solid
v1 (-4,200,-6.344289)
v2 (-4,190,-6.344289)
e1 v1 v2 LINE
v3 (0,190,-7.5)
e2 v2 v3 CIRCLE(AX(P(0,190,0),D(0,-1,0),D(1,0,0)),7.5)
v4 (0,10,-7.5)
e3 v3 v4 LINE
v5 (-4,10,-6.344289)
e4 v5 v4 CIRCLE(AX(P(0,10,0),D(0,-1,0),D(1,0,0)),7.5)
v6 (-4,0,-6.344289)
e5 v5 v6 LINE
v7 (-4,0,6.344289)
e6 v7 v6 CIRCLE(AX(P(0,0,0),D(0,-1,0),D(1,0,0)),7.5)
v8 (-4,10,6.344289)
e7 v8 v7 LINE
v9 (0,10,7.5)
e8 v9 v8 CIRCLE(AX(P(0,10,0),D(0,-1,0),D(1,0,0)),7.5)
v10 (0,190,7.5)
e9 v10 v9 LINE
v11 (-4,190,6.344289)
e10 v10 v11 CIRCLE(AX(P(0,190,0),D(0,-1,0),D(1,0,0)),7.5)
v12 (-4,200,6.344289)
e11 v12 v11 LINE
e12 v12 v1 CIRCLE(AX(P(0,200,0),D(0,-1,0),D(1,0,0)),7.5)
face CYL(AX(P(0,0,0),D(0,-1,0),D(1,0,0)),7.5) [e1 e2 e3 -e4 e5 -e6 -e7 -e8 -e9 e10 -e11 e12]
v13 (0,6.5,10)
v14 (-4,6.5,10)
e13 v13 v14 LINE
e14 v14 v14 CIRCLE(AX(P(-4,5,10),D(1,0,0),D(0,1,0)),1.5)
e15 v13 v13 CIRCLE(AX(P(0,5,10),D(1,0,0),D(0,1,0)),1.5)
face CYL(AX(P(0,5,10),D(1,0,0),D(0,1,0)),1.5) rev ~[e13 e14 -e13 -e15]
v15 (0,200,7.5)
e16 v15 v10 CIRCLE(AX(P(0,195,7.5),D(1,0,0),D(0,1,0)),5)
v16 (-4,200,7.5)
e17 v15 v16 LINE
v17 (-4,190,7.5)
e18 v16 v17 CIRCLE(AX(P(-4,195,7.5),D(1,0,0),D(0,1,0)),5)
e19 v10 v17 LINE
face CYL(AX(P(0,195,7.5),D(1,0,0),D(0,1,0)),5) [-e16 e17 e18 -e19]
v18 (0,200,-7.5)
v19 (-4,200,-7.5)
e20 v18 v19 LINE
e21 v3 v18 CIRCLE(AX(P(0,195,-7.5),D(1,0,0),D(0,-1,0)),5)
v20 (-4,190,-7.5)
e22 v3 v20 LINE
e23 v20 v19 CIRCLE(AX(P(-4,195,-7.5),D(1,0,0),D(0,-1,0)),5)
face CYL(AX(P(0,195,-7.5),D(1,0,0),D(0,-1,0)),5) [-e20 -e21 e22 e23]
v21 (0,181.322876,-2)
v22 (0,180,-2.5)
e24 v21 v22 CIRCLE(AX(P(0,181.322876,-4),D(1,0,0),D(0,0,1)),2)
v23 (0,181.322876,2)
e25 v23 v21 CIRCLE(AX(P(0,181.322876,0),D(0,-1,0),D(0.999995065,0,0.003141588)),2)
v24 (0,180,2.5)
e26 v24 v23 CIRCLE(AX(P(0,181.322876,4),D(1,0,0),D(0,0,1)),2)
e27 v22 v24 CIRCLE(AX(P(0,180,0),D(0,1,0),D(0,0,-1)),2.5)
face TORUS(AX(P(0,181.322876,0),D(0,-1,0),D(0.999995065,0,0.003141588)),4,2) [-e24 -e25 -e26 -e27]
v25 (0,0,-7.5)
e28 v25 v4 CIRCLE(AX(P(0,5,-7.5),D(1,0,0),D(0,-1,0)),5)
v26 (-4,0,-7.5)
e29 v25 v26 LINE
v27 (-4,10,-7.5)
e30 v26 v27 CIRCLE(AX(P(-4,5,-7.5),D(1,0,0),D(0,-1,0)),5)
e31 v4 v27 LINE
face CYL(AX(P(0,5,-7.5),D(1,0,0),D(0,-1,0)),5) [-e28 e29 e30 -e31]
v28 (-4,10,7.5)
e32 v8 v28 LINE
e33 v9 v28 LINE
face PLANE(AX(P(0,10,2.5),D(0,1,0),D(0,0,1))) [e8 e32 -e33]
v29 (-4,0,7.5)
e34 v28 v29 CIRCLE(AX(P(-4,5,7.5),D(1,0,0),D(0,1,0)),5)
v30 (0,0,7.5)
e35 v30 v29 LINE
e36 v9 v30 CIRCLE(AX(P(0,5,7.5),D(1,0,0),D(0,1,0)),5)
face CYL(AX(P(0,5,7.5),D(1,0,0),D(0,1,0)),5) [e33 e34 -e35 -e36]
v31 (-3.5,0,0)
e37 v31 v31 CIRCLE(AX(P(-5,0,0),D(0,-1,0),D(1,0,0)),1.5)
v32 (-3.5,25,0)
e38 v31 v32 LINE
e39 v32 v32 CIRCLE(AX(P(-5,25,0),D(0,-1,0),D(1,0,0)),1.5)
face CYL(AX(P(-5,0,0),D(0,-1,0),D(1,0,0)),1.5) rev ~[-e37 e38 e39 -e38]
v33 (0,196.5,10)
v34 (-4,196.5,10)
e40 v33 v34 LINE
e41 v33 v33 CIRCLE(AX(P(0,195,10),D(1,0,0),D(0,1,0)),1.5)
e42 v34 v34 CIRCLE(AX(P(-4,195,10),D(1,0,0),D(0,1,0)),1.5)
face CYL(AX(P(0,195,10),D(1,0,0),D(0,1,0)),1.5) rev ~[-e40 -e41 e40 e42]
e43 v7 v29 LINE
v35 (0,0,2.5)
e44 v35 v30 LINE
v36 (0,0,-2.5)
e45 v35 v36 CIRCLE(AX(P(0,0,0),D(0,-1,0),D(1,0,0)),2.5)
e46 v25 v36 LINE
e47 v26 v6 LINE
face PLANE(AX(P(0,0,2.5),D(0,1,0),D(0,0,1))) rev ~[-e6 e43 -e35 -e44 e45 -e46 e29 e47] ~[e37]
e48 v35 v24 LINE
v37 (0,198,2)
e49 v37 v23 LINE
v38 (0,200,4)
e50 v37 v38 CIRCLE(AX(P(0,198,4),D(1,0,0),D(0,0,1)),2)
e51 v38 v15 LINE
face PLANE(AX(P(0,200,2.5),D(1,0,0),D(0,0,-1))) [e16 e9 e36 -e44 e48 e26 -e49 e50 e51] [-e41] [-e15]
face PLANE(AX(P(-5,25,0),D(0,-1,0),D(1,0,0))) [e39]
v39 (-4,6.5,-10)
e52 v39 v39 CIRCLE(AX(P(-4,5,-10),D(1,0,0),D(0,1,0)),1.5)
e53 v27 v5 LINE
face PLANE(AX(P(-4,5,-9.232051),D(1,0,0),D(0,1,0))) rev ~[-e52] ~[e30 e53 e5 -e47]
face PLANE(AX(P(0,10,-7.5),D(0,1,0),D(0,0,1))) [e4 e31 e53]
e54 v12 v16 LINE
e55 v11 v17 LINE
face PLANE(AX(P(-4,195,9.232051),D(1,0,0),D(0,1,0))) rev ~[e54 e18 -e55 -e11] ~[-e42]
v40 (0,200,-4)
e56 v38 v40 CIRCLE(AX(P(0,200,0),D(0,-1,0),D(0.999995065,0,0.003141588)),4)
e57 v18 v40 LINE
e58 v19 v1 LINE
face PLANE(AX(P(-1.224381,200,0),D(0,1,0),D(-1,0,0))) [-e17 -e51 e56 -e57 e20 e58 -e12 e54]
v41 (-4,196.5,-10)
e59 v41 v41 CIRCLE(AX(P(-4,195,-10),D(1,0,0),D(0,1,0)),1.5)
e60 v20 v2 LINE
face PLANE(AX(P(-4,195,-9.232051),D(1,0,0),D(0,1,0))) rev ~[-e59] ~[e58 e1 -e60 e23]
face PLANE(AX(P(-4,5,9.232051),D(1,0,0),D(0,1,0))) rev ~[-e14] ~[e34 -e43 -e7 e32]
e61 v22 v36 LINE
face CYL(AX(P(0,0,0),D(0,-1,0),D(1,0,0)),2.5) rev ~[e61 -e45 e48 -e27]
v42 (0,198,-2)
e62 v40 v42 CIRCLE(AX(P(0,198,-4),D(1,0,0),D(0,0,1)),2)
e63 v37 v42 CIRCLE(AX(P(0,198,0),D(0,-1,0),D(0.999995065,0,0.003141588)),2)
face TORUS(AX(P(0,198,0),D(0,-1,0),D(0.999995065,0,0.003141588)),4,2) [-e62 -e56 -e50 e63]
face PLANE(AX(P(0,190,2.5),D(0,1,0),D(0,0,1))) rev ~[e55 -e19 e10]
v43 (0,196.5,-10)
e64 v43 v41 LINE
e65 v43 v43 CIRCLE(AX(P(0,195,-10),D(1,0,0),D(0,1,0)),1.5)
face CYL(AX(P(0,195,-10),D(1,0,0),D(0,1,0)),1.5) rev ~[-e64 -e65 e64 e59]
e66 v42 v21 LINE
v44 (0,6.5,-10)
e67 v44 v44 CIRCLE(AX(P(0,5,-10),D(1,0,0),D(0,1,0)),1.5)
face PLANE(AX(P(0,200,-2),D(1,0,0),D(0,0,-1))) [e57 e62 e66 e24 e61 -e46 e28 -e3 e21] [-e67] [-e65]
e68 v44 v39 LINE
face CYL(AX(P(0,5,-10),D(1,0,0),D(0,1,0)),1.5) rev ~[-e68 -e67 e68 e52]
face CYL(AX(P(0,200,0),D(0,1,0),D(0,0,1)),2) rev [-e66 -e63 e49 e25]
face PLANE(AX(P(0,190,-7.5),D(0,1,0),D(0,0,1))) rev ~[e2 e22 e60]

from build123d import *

# Parameters (mm, degrees)
F0_R         = 7.5
F0_R_2       = 2.5
F1_DEPTH     = 200
F2_R         = 1.5
F3_DEPTH     = 25
F4_W         = 255.6320726871
F4_H         = 34.7503256053
F5_DEPTH     = 25
F6_W         = 10
F6_H         = 5
F6_H_2       = 4.8793365061
F7_DEPTH     = 4
F8_R         = 1.5
F9_DEPTH     = 7.501
F11_DEPTH    = 20
F12_T2_ANGLE = 359.64
F12_T4_ANGLE = 359.64


# Not quite as in the source:
# - a fillet or chamfer that OpenCascade refuses, or shapes differently, is made with other operations: its cross-section is extruded or revolved along the edge and cut away or added


with BuildPart() as f1:
    # F0 (on Front) → F1 (new body)
    with BuildSketch(Plane.XZ):
        Circle(F0_R)
        Circle(F0_R_2, mode=Mode.SUBTRACT)
    extrude(amount=-F1_DEPTH)

    # F2 (on face) → F3 (cut)
    with BuildSketch(Plane.XZ):
        with Locations((5, 0)):
            Circle(F2_R)
        with Locations((-5, 0)):
            Circle(F2_R)
    extrude(amount=-F3_DEPTH, mode=Mode.SUBTRACT)

    # F4 (on Right) → F5 (cut)
    with BuildSketch(Plane.YZ):
        with Locations((127.8160363436, -0.9753750637)):
            Rectangle(F4_W, F4_H)
    extrude(amount=F5_DEPTH, mode=Mode.SUBTRACT)

    # F6 (on face) → F7 (join)
    with BuildSketch(Plane.YZ):
        with BuildLine():
            ThreePointArc((10, 7.5), (5, 12.5), (0, 7.5))
            Line((0, 7.5), (10, 7.5))
        make_face()
        with Locations((5, 5)):
            Rectangle(F6_W, F6_H)
        with BuildLine():
            Line((190, 7.5), (200, 7.5))
            ThreePointArc((200, 7.5), (195, 12.5), (190, 7.5))
        make_face()
        with Locations((195, 5)):
            Rectangle(F6_W, F6_H)
        with BuildLine():
            ThreePointArc((190, -7.5), (195, -12.5), (200, -7.5))
            Line((200, -7.5), (190, -7.5))
        make_face()
        with Locations((195, -5.0603317469)):
            Rectangle(F6_W, F6_H_2)
        with BuildLine():
            Line((10, -7.5), (0, -7.5))
            ThreePointArc((0, -7.5), (5, -12.5), (10, -7.5))
        make_face()
        with Locations((5, -5.0603317469)):
            Rectangle(F6_W, F6_H_2)
    extrude(amount=-F7_DEPTH)

    # F8 (on face) → F9 (cut, through all)
    with BuildSketch(Plane.YZ):
        with Locations((5, 10)):
            Circle(F8_R)
        with Locations((5, -10)):
            Circle(F8_R)
        with Locations((195, 10)):
            Circle(F8_R)
        with Locations((195, -10)):
            Circle(F8_R)
    extrude(amount=-F9_DEPTH, mode=Mode.SUBTRACT)

    # F10 (on face) → F11 (join)
    with BuildSketch(Plane(origin=(0, 200, 0), x_dir=(-1, 0, 0), z_dir=(0, 1, 0))):
        with BuildLine():
            ThreePointArc((0, 2), (2, 0), (0, -2))
            Line((0, -2), (0, -2.5))
            ThreePointArc((0, -2.5), (2.5, 0), (0, 2.5))
            Line((0, 2.5), (0, 2))
        make_face()
    extrude(amount=-F11_DEPTH)

    # F12: fillet of radius 2 on 2 edges, made by hand

    # F12_s1 → F12_t2 (revolve, cut)
    with BuildSketch(Plane(origin=(0, 0, 0), x_dir=(0, 1, 0), z_dir=(0.0031415875, 0, -0.9999950652))):
        with BuildLine():
            ThreePointArc((180, 2.5), (180.6157688743, 2.1291713066), (181.3228756555, 2))
            Line((181.3228756555, 2), (180, 2))
            Line((180, 2), (180, 2.5))
        make_face()
    revolve(axis=Axis((0, 180, 0), (0, -1, 0)), revolution_arc=F12_T2_ANGLE, mode=Mode.SUBTRACT)

    # F12_s3 → F12_t4 (revolve, cut)
    with BuildSketch(Plane(origin=(0, 0, 0), x_dir=(0, 1, 0), z_dir=(0.0031415875, 0, -0.9999950652))):
        with BuildLine():
            ThreePointArc((198, 2), (199.4142135624, 2.5857864376), (200, 4))
            Line((200, 4), (200, 2))
            Line((200, 2), (198, 2))
        make_face()
    revolve(axis=Axis((0, 200, 0), (0, -1, 0)), revolution_arc=F12_T4_ANGLE, mode=Mode.SUBTRACT)


solid = f1.part
